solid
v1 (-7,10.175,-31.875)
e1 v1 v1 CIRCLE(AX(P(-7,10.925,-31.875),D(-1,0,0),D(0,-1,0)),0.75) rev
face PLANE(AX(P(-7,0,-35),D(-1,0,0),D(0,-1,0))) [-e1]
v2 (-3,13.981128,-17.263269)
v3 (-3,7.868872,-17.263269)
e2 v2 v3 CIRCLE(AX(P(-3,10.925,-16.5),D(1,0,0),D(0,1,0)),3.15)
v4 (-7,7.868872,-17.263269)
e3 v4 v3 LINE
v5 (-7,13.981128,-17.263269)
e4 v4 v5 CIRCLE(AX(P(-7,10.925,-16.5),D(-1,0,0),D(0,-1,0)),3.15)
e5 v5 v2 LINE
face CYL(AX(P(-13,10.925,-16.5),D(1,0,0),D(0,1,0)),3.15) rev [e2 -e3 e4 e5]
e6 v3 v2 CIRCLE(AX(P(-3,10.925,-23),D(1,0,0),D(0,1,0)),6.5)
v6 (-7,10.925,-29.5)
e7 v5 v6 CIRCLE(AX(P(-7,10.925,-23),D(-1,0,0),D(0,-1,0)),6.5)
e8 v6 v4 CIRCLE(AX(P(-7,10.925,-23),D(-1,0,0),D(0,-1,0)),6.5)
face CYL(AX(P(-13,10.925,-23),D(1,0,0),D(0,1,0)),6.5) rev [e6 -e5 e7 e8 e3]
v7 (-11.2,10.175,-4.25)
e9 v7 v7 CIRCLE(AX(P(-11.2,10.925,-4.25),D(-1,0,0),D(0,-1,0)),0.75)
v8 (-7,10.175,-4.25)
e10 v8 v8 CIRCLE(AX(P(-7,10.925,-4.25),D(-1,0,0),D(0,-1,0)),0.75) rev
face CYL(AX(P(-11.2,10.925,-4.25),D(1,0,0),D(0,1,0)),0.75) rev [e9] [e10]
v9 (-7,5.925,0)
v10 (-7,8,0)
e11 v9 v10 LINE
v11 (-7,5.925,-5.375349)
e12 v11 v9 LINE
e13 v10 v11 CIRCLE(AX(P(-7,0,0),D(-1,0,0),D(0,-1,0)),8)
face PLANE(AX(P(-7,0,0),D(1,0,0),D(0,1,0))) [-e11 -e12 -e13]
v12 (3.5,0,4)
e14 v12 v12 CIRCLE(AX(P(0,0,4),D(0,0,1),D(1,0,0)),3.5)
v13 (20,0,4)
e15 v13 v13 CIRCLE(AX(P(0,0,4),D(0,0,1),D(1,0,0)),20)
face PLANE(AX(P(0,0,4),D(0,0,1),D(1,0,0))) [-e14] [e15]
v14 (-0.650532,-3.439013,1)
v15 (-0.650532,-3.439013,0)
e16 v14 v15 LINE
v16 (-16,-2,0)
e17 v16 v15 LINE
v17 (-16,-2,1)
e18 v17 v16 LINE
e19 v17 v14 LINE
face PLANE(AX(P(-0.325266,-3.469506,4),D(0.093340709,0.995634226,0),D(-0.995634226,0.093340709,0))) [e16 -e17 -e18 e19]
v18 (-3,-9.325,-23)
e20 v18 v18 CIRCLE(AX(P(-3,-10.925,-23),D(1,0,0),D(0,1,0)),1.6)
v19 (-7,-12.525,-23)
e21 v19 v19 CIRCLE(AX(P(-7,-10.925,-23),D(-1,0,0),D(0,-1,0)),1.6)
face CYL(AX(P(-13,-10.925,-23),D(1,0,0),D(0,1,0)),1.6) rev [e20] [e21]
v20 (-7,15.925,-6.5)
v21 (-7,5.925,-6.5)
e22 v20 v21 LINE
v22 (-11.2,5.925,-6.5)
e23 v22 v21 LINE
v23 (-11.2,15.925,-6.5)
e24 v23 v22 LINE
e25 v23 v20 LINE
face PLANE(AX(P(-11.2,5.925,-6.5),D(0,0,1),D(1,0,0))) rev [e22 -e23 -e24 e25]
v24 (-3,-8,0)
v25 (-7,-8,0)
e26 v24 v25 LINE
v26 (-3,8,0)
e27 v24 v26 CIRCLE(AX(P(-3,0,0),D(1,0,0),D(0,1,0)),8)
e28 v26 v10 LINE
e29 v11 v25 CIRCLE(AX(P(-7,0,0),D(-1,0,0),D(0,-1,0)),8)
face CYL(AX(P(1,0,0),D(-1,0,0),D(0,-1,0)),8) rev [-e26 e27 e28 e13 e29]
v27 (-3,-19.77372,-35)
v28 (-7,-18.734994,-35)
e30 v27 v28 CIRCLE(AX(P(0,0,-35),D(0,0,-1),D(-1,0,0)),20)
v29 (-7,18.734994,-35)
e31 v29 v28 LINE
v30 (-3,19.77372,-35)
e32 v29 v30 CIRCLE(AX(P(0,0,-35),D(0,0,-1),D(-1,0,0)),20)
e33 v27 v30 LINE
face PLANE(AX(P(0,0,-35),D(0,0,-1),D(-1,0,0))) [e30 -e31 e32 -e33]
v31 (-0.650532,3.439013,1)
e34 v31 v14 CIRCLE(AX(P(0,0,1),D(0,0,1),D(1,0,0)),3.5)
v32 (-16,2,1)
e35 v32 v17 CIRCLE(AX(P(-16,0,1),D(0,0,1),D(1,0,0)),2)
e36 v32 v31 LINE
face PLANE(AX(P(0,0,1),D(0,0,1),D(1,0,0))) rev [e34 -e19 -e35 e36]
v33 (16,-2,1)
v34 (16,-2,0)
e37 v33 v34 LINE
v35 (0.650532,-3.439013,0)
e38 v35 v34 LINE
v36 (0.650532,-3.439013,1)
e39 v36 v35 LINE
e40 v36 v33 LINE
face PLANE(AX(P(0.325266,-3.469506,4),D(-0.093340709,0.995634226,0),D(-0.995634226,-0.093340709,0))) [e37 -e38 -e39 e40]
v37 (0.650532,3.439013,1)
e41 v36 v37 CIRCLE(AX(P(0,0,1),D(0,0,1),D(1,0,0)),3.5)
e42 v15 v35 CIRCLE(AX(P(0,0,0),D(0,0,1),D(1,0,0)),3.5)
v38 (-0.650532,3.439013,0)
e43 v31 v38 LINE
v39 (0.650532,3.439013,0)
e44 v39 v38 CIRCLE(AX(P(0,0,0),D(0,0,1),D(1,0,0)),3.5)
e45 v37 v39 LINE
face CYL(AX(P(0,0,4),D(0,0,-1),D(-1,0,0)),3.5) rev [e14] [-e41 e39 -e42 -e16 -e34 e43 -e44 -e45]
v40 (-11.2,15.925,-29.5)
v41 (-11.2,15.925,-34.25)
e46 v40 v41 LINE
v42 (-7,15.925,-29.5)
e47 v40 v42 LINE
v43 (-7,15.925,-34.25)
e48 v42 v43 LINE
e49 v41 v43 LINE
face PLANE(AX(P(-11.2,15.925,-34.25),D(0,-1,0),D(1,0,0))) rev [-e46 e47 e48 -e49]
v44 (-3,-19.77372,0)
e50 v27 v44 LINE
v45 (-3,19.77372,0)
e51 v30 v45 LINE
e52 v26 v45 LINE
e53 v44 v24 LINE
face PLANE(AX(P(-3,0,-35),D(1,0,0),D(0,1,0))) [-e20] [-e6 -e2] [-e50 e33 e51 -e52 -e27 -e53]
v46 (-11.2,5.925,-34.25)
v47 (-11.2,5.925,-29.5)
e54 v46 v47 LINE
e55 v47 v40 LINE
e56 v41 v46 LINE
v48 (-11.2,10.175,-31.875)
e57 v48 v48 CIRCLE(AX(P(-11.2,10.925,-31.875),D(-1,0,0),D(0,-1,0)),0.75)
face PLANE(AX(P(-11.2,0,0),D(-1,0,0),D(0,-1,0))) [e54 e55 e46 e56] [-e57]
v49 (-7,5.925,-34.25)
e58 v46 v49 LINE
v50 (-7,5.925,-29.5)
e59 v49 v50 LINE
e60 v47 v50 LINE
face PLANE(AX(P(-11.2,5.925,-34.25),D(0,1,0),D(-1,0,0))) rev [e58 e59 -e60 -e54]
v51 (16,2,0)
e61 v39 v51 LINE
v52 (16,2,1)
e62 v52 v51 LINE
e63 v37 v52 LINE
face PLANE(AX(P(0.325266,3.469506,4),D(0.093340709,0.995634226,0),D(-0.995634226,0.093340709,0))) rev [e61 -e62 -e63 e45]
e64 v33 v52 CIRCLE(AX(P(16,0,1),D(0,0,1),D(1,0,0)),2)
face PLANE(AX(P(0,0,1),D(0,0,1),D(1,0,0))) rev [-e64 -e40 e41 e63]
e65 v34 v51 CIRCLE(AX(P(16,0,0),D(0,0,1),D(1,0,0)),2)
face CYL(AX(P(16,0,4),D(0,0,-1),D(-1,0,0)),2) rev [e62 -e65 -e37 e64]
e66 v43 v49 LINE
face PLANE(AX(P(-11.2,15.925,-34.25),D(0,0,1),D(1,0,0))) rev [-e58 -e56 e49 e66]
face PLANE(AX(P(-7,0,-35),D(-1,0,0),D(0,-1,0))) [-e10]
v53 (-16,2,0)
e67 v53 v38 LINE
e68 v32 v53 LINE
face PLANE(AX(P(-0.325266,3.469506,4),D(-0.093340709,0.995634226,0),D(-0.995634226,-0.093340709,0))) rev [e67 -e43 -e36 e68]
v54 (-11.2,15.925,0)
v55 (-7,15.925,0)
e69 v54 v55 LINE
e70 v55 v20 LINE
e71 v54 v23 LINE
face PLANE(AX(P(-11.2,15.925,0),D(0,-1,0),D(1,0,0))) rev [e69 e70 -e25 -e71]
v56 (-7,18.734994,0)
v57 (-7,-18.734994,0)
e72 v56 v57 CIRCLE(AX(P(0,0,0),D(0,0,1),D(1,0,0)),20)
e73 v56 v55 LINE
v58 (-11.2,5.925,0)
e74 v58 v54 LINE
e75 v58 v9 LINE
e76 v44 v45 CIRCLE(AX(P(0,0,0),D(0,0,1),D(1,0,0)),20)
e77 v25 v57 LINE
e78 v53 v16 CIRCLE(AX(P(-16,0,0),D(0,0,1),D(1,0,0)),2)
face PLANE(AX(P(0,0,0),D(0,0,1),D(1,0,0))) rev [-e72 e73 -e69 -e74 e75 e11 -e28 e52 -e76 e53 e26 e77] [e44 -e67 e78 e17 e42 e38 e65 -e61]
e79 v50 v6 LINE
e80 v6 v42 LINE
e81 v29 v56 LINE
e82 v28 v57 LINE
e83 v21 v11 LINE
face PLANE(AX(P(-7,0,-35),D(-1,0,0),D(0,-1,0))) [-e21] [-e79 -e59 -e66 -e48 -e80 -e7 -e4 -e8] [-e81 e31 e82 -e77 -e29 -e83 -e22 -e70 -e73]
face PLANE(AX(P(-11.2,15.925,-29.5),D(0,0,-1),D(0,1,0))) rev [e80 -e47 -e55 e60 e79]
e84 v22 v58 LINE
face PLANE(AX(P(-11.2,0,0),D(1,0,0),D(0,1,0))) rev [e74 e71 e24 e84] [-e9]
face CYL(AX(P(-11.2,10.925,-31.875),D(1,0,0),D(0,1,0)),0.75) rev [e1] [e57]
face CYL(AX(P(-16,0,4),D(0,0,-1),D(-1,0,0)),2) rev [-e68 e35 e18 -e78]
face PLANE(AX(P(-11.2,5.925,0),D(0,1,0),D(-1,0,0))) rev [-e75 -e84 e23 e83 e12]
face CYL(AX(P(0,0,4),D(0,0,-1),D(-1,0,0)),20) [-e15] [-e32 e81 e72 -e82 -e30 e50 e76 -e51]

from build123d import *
from build123d.topology import SkipClean

# Parameters (mm, degrees)
ESBO_O1_R                = 20
RESSALTO_EXTRUS_O1_DEPTH = 4
RESSALTO_EXTRUS_O2_START = -3
ESBO_O2_R                = 3.5
RESSALTO_EXTRUS_O2_DEPTH = 3
RESSALTO_EXTRUS_O4_DEPTH = 35
ESBO_O4_R                = 1.6
CORTE_EXTRUS_O1_DEPTH    = 10
CORTE_EXTRUS_O3_DEPTH    = 8
ESBO_O10_W               = 6.5
ESBO_O10_H               = 10
ESBO_O10_R               = 0.75
ESBO_O10_W_2             = 4.75
RESSALTO_EXTRUS_O5_DEPTH = 4.2


# Read off the part's stored shape, not the designer's step: Ressalto-extrusão4
with BuildPart() as part:
    # Esboço1 → Ressalto-extrusão1 (new body)
    with BuildSketch(Plane.XY):
        Circle(ESBO_O1_R)
        with BuildLine():
            ThreePointArc((-16, -2), (-18, 0), (-16, 2))
            Line((-16, 2), (-0.65053243, 3.439012585))
            ThreePointArc((-0.65053243, 3.439012585), (-0.32669248, 3.484719791), (0, 3.5))
            ThreePointArc((0, 3.5), (0.32669248, 3.484719791), (0.65053243, 3.439012585))
            Line((0.65053243, 3.439012585), (16, 2))
            ThreePointArc((16, 2), (18, 0), (16, -2))
            Line((16, -2), (0.65053243, -3.439012585))
            ThreePointArc((0.65053243, -3.439012585), (0.32669248, -3.484719791), (0, -3.5))
            ThreePointArc((0, -3.5), (-0.32669248, -3.484719791), (-0.65053243, -3.439012585))
            Line((-0.65053243, -3.439012585), (-16, -2))
        make_face(mode=Mode.SUBTRACT)
    extrude(amount=RESSALTO_EXTRUS_O1_DEPTH)

    # Esboço2 → Ressalto-extrusão2 (add)
    with SkipClean():  # the faces are left unmerged after this step: merging them gives an invalid solid
        with BuildSketch(Plane.XY.offset(4).offset(RESSALTO_EXTRUS_O2_START)):
            with BuildLine():
                Line((-19.070572075, 6.026050177), (19.070572075, 6.026050177))
                ThreePointArc((19.070572075, 6.026050177), (20, 0), (19.070572075, -6.026050177))
                Line((19.070572075, -6.026050177), (-19.070572075, -6.026050177))
                ThreePointArc((-19.070572075, -6.026050177), (-20, 0), (-19.070572075, 6.026050177))
            make_face()
            with Locations(Location((0, 0, 0), (0, 0, 100.711650086))):
                Circle(ESBO_O2_R, mode=Mode.SUBTRACT)
        extrude(amount=RESSALTO_EXTRUS_O2_DEPTH)

    # Ressalto-extrusão4 outline → Ressalto-extrusão4 (add)
    with SkipClean():  # the faces are left unmerged after this step: merging them gives an invalid solid
        with BuildSketch(Plane(origin=(0, 0, 0), x_dir=(-1, 0, 0), z_dir=(0, 0, -1))):
            with BuildLine():
                ThreePointArc((3, -19.773719933), (5.026901421, -19.357950876), (7, -18.734993995))
                Line((7, -18.734993995), (7, 18.734993995))
                ThreePointArc((7, 18.734993995), (5.026901421, 19.357950876), (3, 19.773719933))
                Line((3, 19.773719933), (3, -19.773719933))
            make_face()
        extrude(amount=RESSALTO_EXTRUS_O4_DEPTH)

    # Esboço4 → Corte-extrusão1 (cut)
    with SkipClean():  # the faces are left unmerged after this step: merging them gives an invalid solid
        with BuildSketch(Plane(origin=(-3, 0, 0), x_dir=(0, 0, -1), z_dir=(1, 0, 0))):
            with Locations(Location((23, -10.925, 0), (0, 0, 90))):
                Circle(ESBO_O4_R)
            with BuildLine():
                ThreePointArc((17.263269231, 7.868871717), (29.5, 10.925), (17.263269231, 13.981128283))
                ThreePointArc((17.263269231, 13.981128283), (13.35, 10.925), (17.263269231, 7.868871717))
            make_face()
        extrude(amount=-CORTE_EXTRUS_O1_DEPTH, mode=Mode.SUBTRACT)

    # Esboço9 → Corte-extrusão3 (cut)
    with SkipClean():  # the faces are left unmerged after this step: merging them gives an invalid solid
        with BuildSketch(Plane.ZY.offset(7)):
            with BuildLine():
                Line((0, 8), (0, -8))
                ThreePointArc((0, -8), (-8, 0), (0, 8))
            make_face()
        extrude(amount=-CORTE_EXTRUS_O3_DEPTH, mode=Mode.SUBTRACT)

    # Esboço10 → Ressalto-extrusão5 (add)
    # profile 1 of 2: a face of its own
    with SkipClean():  # the faces are left unmerged after this step: merging them gives an invalid solid
        with BuildSketch(Plane.ZY.offset(7)):
            with Locations((-3.25, 10.925)):
                Rectangle(ESBO_O10_W, ESBO_O10_H)
            with Locations(Location((-4.25, 10.925, 0), (0, 0, 270))):
                Circle(ESBO_O10_R, mode=Mode.SUBTRACT)
        # profile 2 of 2: a face of its own
        with BuildSketch(Plane.ZY.offset(7)):
            with Locations((-31.875, 10.925)):
                Rectangle(ESBO_O10_W_2, ESBO_O10_H)
            with Locations(Location((-31.875, 10.925, 0), (0, 0, 270))):
                Circle(ESBO_O10_R, mode=Mode.SUBTRACT)
        extrude(amount=RESSALTO_EXTRUS_O5_DEPTH)


solid = part.part
